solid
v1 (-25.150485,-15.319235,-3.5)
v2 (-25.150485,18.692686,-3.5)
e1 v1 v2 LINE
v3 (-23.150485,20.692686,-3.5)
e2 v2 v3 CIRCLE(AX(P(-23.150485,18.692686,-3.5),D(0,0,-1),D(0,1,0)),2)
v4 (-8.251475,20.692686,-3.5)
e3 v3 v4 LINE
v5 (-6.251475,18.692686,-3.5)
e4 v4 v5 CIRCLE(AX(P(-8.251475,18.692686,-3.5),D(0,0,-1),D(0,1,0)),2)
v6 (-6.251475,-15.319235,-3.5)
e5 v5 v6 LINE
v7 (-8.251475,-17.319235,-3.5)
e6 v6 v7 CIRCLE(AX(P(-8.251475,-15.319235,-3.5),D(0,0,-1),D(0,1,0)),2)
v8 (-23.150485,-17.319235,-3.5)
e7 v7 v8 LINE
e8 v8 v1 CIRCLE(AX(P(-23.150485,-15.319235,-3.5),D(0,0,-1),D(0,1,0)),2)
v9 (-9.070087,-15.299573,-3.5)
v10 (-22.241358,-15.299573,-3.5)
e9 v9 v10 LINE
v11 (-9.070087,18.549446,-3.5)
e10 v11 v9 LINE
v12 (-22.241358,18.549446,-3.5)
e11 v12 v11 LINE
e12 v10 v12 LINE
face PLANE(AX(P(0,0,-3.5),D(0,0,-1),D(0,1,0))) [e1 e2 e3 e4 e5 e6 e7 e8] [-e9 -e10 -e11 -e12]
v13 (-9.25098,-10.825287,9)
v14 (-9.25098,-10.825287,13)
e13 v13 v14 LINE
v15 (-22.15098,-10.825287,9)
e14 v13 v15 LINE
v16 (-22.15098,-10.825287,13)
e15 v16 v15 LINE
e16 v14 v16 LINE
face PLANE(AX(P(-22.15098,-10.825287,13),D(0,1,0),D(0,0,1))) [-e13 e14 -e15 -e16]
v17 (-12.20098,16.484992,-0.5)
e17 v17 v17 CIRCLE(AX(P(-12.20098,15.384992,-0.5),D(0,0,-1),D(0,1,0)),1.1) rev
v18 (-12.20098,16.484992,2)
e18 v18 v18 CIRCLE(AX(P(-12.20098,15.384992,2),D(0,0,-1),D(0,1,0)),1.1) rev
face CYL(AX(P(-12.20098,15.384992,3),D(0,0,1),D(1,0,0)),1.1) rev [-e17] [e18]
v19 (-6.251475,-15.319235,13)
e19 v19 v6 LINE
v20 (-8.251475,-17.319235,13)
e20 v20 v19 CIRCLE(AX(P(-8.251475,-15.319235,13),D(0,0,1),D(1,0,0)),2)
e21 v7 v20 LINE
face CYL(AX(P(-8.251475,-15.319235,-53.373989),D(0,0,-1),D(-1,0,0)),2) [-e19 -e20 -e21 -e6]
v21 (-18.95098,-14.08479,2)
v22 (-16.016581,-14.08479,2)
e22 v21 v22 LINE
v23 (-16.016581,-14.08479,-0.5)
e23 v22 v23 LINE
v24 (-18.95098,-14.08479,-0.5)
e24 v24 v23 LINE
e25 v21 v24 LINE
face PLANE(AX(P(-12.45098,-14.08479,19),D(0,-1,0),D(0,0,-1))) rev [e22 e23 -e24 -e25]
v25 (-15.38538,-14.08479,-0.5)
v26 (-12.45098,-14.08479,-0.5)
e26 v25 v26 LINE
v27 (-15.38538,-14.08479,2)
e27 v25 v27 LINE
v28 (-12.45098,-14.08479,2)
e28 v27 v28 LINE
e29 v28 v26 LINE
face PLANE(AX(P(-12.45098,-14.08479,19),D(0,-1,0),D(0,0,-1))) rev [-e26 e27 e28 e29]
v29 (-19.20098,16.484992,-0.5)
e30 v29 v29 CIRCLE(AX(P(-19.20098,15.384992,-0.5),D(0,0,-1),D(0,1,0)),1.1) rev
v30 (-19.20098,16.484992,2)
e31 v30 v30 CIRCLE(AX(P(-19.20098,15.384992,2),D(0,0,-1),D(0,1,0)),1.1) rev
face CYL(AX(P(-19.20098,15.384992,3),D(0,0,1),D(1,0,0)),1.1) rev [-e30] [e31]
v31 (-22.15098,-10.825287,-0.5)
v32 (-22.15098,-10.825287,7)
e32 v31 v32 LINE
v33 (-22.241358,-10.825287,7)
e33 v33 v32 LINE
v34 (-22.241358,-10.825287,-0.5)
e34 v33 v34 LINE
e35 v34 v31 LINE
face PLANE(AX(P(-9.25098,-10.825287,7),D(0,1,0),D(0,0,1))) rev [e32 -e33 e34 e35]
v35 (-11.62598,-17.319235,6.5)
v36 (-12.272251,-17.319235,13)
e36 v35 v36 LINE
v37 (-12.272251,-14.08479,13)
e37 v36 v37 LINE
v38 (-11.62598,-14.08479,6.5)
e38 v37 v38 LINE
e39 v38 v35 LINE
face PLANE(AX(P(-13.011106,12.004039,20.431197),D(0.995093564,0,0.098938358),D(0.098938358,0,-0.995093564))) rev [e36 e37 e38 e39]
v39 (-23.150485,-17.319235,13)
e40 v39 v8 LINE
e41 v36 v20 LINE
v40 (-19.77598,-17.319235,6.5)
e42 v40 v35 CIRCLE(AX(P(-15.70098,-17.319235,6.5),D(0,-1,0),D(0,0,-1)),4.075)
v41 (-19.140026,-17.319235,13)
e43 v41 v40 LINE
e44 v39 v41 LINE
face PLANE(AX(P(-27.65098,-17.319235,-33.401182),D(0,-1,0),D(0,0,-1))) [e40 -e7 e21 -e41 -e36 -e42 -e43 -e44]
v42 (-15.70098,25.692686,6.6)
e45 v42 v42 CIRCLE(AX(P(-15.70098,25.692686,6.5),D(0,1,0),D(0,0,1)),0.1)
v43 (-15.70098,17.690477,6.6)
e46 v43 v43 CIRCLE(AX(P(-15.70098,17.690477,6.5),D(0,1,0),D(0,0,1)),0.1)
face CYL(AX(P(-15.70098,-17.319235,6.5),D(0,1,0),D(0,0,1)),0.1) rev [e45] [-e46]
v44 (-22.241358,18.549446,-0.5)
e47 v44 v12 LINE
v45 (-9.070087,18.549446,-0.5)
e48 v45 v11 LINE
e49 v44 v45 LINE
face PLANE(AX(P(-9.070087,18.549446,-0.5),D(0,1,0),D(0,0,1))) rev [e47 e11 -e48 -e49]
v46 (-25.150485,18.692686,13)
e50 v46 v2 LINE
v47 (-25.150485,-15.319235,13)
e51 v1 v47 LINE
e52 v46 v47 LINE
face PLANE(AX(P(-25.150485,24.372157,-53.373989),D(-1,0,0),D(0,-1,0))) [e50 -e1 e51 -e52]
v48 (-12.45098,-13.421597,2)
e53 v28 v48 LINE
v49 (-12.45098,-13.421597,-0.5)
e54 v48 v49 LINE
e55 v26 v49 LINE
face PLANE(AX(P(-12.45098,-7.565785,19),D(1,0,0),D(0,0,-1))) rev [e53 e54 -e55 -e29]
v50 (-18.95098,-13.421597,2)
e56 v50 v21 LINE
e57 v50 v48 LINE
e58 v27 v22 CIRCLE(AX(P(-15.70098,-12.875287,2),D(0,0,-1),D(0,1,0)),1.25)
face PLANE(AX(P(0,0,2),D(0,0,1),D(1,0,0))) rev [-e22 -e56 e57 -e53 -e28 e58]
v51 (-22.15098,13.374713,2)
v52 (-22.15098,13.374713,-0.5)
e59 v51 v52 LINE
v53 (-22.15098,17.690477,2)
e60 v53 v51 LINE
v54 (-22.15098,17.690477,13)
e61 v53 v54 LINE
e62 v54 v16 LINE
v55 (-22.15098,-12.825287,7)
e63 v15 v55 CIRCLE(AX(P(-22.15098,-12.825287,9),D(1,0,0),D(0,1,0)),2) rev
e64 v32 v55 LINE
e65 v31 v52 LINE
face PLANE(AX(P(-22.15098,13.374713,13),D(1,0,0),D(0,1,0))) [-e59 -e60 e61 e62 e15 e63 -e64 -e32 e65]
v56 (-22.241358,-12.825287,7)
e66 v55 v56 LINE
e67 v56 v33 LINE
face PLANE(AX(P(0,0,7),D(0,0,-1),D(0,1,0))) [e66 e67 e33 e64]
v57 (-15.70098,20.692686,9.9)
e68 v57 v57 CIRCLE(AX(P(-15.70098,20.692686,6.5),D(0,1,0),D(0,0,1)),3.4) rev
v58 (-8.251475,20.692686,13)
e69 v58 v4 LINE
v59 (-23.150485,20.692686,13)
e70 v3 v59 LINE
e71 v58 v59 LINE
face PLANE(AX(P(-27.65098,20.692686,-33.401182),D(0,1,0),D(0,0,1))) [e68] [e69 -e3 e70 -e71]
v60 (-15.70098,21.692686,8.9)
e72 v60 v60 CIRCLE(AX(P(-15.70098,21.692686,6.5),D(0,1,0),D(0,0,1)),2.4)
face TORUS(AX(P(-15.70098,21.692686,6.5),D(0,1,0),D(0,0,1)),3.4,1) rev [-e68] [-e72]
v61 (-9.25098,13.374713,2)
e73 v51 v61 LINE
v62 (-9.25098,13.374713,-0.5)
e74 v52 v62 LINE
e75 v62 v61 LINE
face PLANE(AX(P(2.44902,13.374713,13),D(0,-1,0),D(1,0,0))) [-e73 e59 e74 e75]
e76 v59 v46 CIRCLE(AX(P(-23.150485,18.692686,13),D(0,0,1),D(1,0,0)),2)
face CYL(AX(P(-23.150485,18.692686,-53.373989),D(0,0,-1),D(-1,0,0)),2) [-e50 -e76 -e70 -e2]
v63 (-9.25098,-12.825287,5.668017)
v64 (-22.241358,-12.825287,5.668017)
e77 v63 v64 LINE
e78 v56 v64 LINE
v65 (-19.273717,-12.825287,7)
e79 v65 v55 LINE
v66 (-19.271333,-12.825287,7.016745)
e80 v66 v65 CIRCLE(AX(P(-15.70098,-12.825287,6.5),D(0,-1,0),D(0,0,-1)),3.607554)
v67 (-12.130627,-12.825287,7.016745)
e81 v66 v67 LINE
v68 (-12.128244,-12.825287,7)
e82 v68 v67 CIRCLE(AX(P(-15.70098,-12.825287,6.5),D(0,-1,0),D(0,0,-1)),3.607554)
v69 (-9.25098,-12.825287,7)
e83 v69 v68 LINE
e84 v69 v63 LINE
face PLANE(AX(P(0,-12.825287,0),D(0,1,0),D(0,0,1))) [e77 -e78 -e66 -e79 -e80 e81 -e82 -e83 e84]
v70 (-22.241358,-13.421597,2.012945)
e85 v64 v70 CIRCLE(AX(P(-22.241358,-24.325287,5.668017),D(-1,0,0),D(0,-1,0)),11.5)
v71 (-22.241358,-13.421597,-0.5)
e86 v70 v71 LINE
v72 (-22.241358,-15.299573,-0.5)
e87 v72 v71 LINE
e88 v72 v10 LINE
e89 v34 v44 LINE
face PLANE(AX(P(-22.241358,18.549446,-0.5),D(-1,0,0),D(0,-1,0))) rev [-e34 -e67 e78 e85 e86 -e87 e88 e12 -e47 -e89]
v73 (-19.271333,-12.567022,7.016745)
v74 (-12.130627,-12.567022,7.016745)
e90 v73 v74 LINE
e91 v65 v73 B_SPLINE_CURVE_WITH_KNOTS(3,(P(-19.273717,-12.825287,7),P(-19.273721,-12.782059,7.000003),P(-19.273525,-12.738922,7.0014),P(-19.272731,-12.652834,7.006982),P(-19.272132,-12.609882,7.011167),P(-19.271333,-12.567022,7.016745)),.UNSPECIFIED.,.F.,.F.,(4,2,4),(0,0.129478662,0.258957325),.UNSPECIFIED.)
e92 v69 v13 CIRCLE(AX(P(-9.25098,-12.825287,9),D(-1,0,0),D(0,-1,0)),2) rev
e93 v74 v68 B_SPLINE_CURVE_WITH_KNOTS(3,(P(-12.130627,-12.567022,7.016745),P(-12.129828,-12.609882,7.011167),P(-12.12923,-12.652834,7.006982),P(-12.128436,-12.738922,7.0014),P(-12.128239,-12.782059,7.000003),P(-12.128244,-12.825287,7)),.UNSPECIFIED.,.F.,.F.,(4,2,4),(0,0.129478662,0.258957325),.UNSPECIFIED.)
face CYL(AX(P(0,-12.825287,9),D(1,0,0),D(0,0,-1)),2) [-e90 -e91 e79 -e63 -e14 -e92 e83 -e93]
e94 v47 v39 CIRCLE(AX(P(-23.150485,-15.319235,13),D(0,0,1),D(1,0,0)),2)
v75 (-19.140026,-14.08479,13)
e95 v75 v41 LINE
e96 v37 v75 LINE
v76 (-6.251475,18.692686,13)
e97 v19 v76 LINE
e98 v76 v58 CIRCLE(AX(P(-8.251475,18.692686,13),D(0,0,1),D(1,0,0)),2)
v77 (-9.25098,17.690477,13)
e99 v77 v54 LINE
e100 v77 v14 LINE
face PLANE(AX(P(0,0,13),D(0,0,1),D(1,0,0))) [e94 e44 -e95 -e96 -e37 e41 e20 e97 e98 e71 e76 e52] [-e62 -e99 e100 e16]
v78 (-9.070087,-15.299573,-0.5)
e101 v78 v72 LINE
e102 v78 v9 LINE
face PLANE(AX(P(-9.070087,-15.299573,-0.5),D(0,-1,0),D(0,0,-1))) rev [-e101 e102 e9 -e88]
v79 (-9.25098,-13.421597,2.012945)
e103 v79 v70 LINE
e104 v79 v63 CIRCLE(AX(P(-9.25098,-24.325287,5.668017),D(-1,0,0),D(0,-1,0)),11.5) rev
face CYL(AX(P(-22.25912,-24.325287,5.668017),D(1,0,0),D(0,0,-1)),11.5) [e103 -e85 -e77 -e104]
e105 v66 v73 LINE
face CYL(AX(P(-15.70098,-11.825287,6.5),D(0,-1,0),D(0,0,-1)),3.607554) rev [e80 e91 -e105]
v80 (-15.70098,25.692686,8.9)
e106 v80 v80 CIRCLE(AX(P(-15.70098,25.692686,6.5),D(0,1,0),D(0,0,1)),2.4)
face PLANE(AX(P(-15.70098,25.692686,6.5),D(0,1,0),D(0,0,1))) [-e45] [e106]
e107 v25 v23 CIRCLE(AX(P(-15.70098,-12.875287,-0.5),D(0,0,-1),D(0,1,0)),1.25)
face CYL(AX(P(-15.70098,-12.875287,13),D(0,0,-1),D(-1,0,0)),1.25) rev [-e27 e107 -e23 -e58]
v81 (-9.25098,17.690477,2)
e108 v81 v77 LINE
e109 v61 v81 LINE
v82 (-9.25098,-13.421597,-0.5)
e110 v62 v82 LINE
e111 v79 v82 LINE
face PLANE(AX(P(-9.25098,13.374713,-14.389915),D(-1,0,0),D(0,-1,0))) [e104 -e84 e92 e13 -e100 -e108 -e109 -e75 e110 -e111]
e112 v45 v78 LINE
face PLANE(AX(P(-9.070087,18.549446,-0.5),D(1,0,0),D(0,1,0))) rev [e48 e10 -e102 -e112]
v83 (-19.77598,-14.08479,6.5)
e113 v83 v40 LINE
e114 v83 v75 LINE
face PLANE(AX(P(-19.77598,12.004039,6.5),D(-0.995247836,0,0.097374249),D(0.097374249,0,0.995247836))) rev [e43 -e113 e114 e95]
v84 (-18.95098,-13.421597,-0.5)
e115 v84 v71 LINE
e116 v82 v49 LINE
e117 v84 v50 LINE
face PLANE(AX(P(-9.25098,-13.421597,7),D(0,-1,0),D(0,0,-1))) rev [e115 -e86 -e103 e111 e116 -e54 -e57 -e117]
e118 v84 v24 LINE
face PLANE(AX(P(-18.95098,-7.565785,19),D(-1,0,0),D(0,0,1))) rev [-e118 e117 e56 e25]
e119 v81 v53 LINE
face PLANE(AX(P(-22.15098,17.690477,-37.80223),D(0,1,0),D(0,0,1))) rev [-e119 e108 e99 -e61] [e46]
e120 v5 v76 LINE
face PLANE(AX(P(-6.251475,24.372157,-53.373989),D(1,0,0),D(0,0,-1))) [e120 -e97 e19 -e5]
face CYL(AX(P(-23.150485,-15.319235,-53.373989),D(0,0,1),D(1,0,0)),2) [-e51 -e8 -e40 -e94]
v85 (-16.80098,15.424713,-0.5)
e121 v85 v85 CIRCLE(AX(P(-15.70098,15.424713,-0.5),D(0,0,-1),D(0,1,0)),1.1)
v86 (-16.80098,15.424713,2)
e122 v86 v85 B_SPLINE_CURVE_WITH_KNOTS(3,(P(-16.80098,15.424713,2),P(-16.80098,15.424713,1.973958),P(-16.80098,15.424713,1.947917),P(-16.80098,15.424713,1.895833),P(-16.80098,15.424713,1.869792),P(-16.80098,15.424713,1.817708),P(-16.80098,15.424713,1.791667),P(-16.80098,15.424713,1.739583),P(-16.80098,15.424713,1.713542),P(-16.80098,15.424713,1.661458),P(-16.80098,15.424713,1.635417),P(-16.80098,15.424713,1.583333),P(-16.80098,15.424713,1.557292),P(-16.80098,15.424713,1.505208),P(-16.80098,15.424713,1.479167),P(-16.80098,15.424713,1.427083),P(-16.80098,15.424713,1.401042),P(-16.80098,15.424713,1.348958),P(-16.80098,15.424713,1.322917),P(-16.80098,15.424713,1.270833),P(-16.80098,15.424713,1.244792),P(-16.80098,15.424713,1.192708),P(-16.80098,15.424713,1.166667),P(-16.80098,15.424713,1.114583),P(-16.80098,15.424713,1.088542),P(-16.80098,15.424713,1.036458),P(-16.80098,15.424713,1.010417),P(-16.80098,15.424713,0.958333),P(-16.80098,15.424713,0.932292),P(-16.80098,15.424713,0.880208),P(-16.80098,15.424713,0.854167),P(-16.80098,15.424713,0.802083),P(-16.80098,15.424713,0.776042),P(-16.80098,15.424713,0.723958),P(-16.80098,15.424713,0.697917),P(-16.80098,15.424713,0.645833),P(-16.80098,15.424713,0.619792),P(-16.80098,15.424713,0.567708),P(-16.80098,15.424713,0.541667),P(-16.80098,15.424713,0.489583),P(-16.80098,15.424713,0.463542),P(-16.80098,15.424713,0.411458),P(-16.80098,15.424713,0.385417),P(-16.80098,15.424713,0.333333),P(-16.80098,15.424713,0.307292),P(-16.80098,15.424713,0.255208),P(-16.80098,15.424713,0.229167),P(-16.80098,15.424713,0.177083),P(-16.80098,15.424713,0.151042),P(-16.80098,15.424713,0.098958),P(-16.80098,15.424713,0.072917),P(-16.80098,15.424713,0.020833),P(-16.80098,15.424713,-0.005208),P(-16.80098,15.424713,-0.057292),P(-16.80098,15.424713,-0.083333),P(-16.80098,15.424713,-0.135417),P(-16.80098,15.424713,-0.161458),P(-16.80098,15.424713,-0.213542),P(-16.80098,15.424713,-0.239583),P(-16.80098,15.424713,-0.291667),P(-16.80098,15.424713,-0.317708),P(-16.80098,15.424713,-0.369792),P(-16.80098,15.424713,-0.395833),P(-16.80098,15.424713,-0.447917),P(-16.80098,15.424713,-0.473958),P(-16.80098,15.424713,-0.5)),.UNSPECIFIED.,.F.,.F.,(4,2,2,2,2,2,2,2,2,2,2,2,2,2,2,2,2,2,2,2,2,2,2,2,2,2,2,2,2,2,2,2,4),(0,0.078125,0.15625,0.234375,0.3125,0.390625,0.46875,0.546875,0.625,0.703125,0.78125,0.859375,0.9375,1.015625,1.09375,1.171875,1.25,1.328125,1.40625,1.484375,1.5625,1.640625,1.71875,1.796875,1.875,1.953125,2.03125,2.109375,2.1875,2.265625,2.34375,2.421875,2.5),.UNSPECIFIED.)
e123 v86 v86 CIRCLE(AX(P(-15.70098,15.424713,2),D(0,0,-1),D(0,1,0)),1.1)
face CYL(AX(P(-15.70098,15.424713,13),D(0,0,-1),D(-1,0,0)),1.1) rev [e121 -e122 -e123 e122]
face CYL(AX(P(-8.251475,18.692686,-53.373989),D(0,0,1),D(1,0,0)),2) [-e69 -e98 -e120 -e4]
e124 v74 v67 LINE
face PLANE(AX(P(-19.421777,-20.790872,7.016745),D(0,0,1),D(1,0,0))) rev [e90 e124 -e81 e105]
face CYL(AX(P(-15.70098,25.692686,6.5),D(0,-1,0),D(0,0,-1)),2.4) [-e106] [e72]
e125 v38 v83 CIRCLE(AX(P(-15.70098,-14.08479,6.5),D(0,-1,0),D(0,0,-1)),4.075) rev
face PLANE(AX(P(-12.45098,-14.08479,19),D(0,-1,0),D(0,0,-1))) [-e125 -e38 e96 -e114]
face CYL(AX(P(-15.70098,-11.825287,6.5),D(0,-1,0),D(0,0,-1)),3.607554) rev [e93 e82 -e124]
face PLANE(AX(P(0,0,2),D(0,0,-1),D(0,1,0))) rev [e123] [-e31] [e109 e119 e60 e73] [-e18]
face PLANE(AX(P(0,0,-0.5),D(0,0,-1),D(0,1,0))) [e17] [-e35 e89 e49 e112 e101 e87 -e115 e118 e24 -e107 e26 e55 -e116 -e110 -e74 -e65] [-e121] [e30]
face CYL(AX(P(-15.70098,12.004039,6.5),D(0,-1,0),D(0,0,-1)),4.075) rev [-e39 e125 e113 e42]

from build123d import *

# Parameters (mm, degrees)
SKETCH_1_W                = 32.6
SKETCH_1_H                = 34.6
SKETCH_1_R                = 1.1
SKETCH_1_R_2              = 1.25
SKETCH_1_W_2              = 24.6
SKETCH_1_H_2              = 24.2
EXTRUDE_1_DEPTH           = 13
SKETCH_3_W                = 6.5
SKETCH_3_H                = 6.519005167
CUT_EXTRUDE_1_DEPTH       = 19
SKETCH_4_W                = 6.5
SKETCH_4_H                = 6.467668889
CUT_EXTRUDE_2_DEPTH       = 23
EXTRUDE_2_DEPTH           = 50
SKETCH_1_2_W              = 22.27659965
SKETCH_1_2_H              = 4.598586669
SKETCH_1_2_W_2            = 22.283050596
SKETCH_1_2_H_2            = 4.977540741
CUT_EXTRUDE_5_DEPTH       = 34
FILLET_1_R                = 2
FILLET_2_R                = 2
SKETCH_9_W                = 54.594998093
SKETCH_9_H                = 18.111982385
SKETCH_9_W_2              = 52.534809486
SKETCH_9_H_2              = 12.989301534
CUT_EXTRUDE_6_DEPTH       = 41
FILLET_6_R                = 22
EXTRUDE_4_DEPTH           = 13
SKETCH_13_W               = 5.518907879
SKETCH_13_H               = 8.361822047
CUT_EXTRUDE_8_DEPTH       = 8.5
SKETCH_14_W               = 6.038657432
SKETCH_14_H               = 7.741248121
CUT_EXTRUDE_9_DEPTH       = 8.5
SKETCH_23_OUTSIDE_W       = 35.102
SKETCH_23_OUTSIDE_H       = 56.702
SKETCH_23_OUTSIDE_W_2     = 1.5
SKETCH_23_OUTSIDE_H_2     = 34.6
CUT_EXTRUDE_10_DEPTH      = 104
SKETCH_24_W               = 10.341780897
SKETCH_24_H               = 5.2
SKETCH_24_R               = 1.25
EXTRUDE_5_DEPTH           = 1.5
SKETCH_25_R               = 1.25
CUT_EXTRUDE_11_DEPTH      = 104
SKETCH_26_OUTSIDE_W       = 115.402
SKETCH_26_OUTSIDE_H       = 56.536
SKETCH_26_OUTSIDE_W_2     = 17.268409177
SKETCH_26_OUTSIDE_H_2     = 34.6
CUT_EXTRUDE_12_DEPTH      = 10
SKETCH_27_W               = 2.368409177
SKETCH_27_H               = 25.781356428
EXTRUDE_6_DEPTH           = 1.5
SKETCH_28_R               = 1.1
CUT_EXTRUDE_13_DEPTH      = 10
CUT_EXTRUDE_START         = -2
CUT_EXTRUDE_14_OUTLINE_W  = 0.368409177
CUT_EXTRUDE_14_OUTLINE_H  = 34.6
CUT_EXTRUDE_14_DEPTH      = 3
SKETCH_30_W               = 15.411127821
SKETCH_30_H               = 34.6
EXTRUDE_7_DEPTH           = 1.5
SKETCH_33_W               = 23.9
SKETCH_33_H               = 38.011921137
SKETCH_33_R               = 1.1
EXTRUDE_8_DEPTH           = 15
SKETCH_34_OUTSIDE_W       = 35.468
SKETCH_34_OUTSIDE_H       = 49.58
SKETCH_34_OUTSIDE_W_2     = 18.899009792
SKETCH_34_OUTSIDE_H_2     = 43.211027868
CUT_EXTRUDE_15_DEPTH      = 13.5
SKETCH_35_W               = 12.9
SKETCH_35_H               = 31.784162084
CUT_EXTRUDE_16_DEPTH      = 11
SKETCH_37_R               = 2.4
EXTRUDE_9_DEPTH           = 5
SKETCH_39_W               = 13.171271292
SKETCH_39_H               = 33.849019387
CUT_EXTRUDE_17_DEPTH      = 3
FILLET_7_R                = 3
CUT_EXTRUDE_18_DEPTH      = 53.759852886
CUT_EXTRUDE_18_DEPTH_BACK = 53.759852886
SKETCH_40_R               = 0.1
SKETCH_42_W               = 13.648654979
SKETCH_42_H               = 4.665334349
EXTRUDE_10_DEPTH          = 11
CUT_EXTRUDE_19_DEPTH      = 4.493948053
SKETCH_43_R               = 3.607554058
CUT_EXTRUDE_20_DEPTH      = 1
SKETCH_44_W               = 12.990377478
SKETCH_44_H               = 2.596310078
CUT_EXTRUDE_21_DEPTH      = 7.5
SKETCH_46_W               = 13.018615597
SKETCH_46_H               = 10.987054625
EXTRUDE_11_DEPTH          = 1.259502583
SKETCH_48_W               = 7.320827495
SKETCH_48_H               = 3.139430645
EXTRUDE_12_DEPTH          = 1
FILLET_9_R                = 11.5
FILLET_11_R               = 2
CUT_EXTRUDE_23_DEPTH      = 41.086666278
CUT_EXTRUDE_23_DEPTH_BACK = 41.086666278
SKETCH_50_W               = 13.704348931
SKETCH_50_H               = 44.342522193
SKETCH_50_W_2             = 6.251475496
FILLET_12_R               = 2
FILLET_13_R               = 1


with BuildPart() as part:
    # Sketch 1 → 凸台-拉伸1 (new body)
    with BuildSketch(Plane.XY):
        with Locations((-9.850980392, 1.274712581)):
            Rectangle(SKETCH_1_W, SKETCH_1_H)
        with Locations(Location((-15.700980392, 15.424712581, 0), (0, 0, 180))):
            Circle(SKETCH_1_R, mode=Mode.SUBTRACT)
        with Locations(Location((-3.600980392, 15.424712581, 0), (0, 0, 180))):
            Circle(SKETCH_1_R_2, mode=Mode.SUBTRACT)
        with Locations(Location((-15.700980392, -12.875287419, 0), (0, 0, 180))):
            Circle(SKETCH_1_R_2, mode=Mode.SUBTRACT)
        with Locations(Location((-3.600980392, -12.875287419, 0), (0, 0, 180))):
            Circle(SKETCH_1_R_2, mode=Mode.SUBTRACT)
        with Locations((-9.850980392, 1.274712581)):
            Rectangle(SKETCH_1_W_2, SKETCH_1_H_2, mode=Mode.SUBTRACT)
    extrude(amount=EXTRUDE_1_DEPTH)

    # 草图3 → 切除-拉伸1 (cut)
    with BuildSketch(Plane(origin=(0, 0, 0), x_dir=(-1, 0, 0), z_dir=(0, 0, -1))):
        with Locations((15.700980392, -10.82528742)):
            Rectangle(SKETCH_3_W, SKETCH_3_H)
    extrude(amount=-CUT_EXTRUDE_1_DEPTH, mode=Mode.SUBTRACT)

    # 草图4 → 切除-拉伸2 (cut)
    with BuildSketch(Plane.XY.offset(13)):
        with Locations((-3.600980392, -10.82528742)):
            Rectangle(SKETCH_4_W, SKETCH_4_H)
    extrude(amount=-CUT_EXTRUDE_2_DEPTH, mode=Mode.SUBTRACT)

    # 草图5 → 凸台-拉伸2 (add)
    with BuildSketch(Plane(origin=(6.449019608, 0, 0), x_dir=(0, 0, -1), z_dir=(1, 0, 0))):
        Polygon((-13, 18.574712581), (-13, 10.055461473), (-13, -16.025287419), (0, -16.025287419), (0, -15.027567927), (0, 16.282461831), (0, 18.574712581), align=None)
    extrude(amount=EXTRUDE_2_DEPTH)

    # Sketch 1 2 → 切除-拉伸5 (cut)
    with BuildSketch(Plane.XY.offset(13)):
        with Locations((24.037173058, -7.263594431)):
            Rectangle(SKETCH_1_2_W, SKETCH_1_2_H)
        with Locations((24.078382453, 0.81654228)):
            Rectangle(SKETCH_1_2_W_2, SKETCH_1_2_H_2)
    extrude(amount=-CUT_EXTRUDE_5_DEPTH, mode=Mode.SUBTRACT)

    # 圆角1
    fillet_1_edges = [part.edges().sort_by_distance(p)[0] for p in [
        (12.936857155, -1.672228091, 6.5),
        (12.936857155, 3.30531265, 6.5),
        (35.219907751, 3.30531265, 6.5),
        (35.219907751, -1.672228091, 6.5),
        (12.898873233, -9.562887765, 6.5),
        (12.898873233, -4.964301096, 6.5),
        (35.175472883, -4.964301096, 6.5),
        (35.175472883, -9.562887765, 6.5),
    ]]
    fillet(fillet_1_edges, radius=FILLET_1_R)

    # 圆角2
    fillet_2_edges = [part.edges().sort_by_distance(p)[0] for p in [
        (-26.150980392, -16.025287419, 6.5),
        (-26.150980392, 18.574712581, 6.5),
    ]]
    fillet(fillet_2_edges, radius=FILLET_2_R)

    # 草图9 → 切除-拉伸6 (cut)
    with BuildSketch(Plane(origin=(0, 0, 0), x_dir=(-1, 0, 0), z_dir=(0, 0, -1))):
        with Locations((-36.934177516, 16.051357777)):
            Rectangle(SKETCH_9_W, SKETCH_9_H)
        with Locations((-36.653242706, -19.247200889)):
            Rectangle(SKETCH_9_W_2, SKETCH_9_H_2)
    extrude(amount=-CUT_EXTRUDE_6_DEPTH, mode=Mode.SUBTRACT)

    # 圆角6
    # the kernel refuses this fillet: 22 mm, written as the material it adds along each edge
    with BuildSketch(Plane(origin=(9.636678469, 6.995366584, 0), x_dir=(0, 1, 0), z_dir=(0, 0, 1))) as fillet_6_piece_1:
        with BuildLine():
            CenterArc((22, -19.375499223), FILLET_6_R, 118.272534833, 61.727465167)
            Line((0, -19.375499223), (-0.44, -19.375499223))
            Line((-0.44, -19.375499223), (-0.44, 0))
            Line((-0.44, 0), (0, 0.44))
            ThreePointArc((0, 0.44), (5.789672998, 0.44), (11.370932916, 0.387509984))
            Line((11.370932916, 0.387509984), (11.579345996, 0))
        make_face()
    extrude(amount=13)
    with BuildSketch(Plane(origin=(10.385837963, -12.752550122, 0), x_dir=(1, 0, 0), z_dir=(0, 0, 1))) as fillet_6_piece_2:
        with BuildLine():
            CenterArc((11.54511289, -22), FILLET_6_R, 90, 31.653290012)
            Line((0, -3.272737297), (-0.230902258, -2.898192043))
            ThreePointArc((-0.230902258, -2.898192043), (-0.44, -1.636368649), (-0.44, 0))
            Line((-0.44, 0), (0, 0.44))
            Line((0, 0.44), (11.54511289, 0.44))
            Line((11.54511289, 0.44), (11.54511289, 0))
        make_face()
    extrude(amount=13)

    # 草图12 → 凸台-拉伸4 (add)
    with BuildSketch(Plane(origin=(0, 0, 0), x_dir=(-1, 0, 0), z_dir=(0, 0, -1))):
        with BuildLine():
            Line((24.150980392, 18.574712581), (24.496655084, -15.99518818))
            ThreePointArc((24.496655084, -15.99518818), (37.015647173, 1.416671567), (24.150980392, 18.574712581))
        make_face()
        with BuildLine():
            Line((26.822698684, 1.289948959), (26.822698684, -8.431688638))
            ThreePointArc((26.822698684, -8.431688638), (32.027920461, 1.289948959), (26.822698684, 11.011586556))
            Line((26.822698684, 11.011586556), (26.822698684, 1.289948959))
        make_face(mode=Mode.SUBTRACT)
    extrude(amount=-EXTRUDE_4_DEPTH)

    # 草图13 → 切除-拉伸8 (cut)
    with BuildSketch(Plane.XY.offset(13)):
        with Locations((-3.600980393, 15.424712581)):
            Rectangle(SKETCH_13_W, SKETCH_13_H)
    extrude(amount=-CUT_EXTRUDE_8_DEPTH, mode=Mode.SUBTRACT)

    # 草图14 → 切除-拉伸9 (cut)
    with BuildSketch(Plane(origin=(0, 0, 0), x_dir=(-1, 0, 0), z_dir=(0, 0, -1))):
        with Locations((15.700980392, 15.424712581)):
            Rectangle(SKETCH_14_W, SKETCH_14_H)
    extrude(amount=-CUT_EXTRUDE_9_DEPTH, mode=Mode.SUBTRACT)

    # 草图23 outside → 切除-拉伸10 (cut)
    with BuildSketch(Plane(origin=(56.449019608, 0, 0), x_dir=(0, 0, -1), z_dir=(1, 0, 0))):
        with Locations((-6.5, 1.275)):
            Rectangle(SKETCH_23_OUTSIDE_W, SKETCH_23_OUTSIDE_H)
        with Locations((-12.25, 1.274712581)):
            Rectangle(SKETCH_23_OUTSIDE_W_2, SKETCH_23_OUTSIDE_H_2, mode=Mode.SUBTRACT)
    extrude(amount=-CUT_EXTRUDE_10_DEPTH, mode=Mode.SUBTRACT)

    # 草图24 → 凸台-拉伸5 (add)
    with BuildSketch(Plane.XY.offset(13)):
        with Locations((-4.17557206, 15.974712581)):
            Rectangle(SKETCH_24_W, SKETCH_24_H)
        with Locations((-3.600980392, 15.429779286)):
            Circle(SKETCH_24_R, mode=Mode.SUBTRACT)
    extrude(amount=-EXTRUDE_5_DEPTH)

    # 草图25 → 切除-拉伸11 (cut)
    with BuildSketch(Plane.XY.offset(13)):
        with Locations((42.624971711, -3.793205976)):
            Circle(SKETCH_25_R)
        with Locations((-34.434765713, 1.289948959)):
            Circle(SKETCH_25_R)
        with Locations((-25.484048207, 14.316394652)):
            Circle(SKETCH_25_R)
        with Locations((-25.484048207, -12.050711449)):
            Circle(SKETCH_25_R)
    extrude(amount=-CUT_EXTRUDE_11_DEPTH, mode=Mode.SUBTRACT)

    # 草图26 outside → 切除-拉伸12 (cut)
    with BuildSketch(Plane.XY.offset(13)):
        with Locations((9.716, 1.275)):
            Rectangle(SKETCH_26_OUTSIDE_W, SKETCH_26_OUTSIDE_H)
        with Locations((-15.516775803, 1.274712581)):
            Rectangle(SKETCH_26_OUTSIDE_W_2, SKETCH_26_OUTSIDE_H_2, mode=Mode.SUBTRACT)
    extrude(amount=-CUT_EXTRUDE_12_DEPTH, mode=Mode.SUBTRACT)

    # 草图27 → 凸台-拉伸6 (add)
    with BuildSketch(Plane.XY.offset(13)):
        with Locations((-8.066775804, 0.484034367)):
            Rectangle(SKETCH_27_W, SKETCH_27_H)
    extrude(amount=-EXTRUDE_6_DEPTH)

    # 草图28 → 切除-拉伸13 (cut)
    with BuildSketch(Plane.XY.offset(13)):
        with Locations((-19.200980392, 15.384992379)):
            Circle(SKETCH_28_R)
        with Locations((-12.200980392, 15.384992379)):
            Circle(SKETCH_28_R)
    extrude(amount=-CUT_EXTRUDE_13_DEPTH, mode=Mode.SUBTRACT)

    # 切除-拉伸14: read off the stored shape, not the designer's step
    # 切除-拉伸14 outline → 切除-拉伸14 (cut)
    with BuildSketch(Plane.XY.offset(13).offset(CUT_EXTRUDE_START)):
        with Locations((-7.066775804, 1.274712581)):
            Rectangle(CUT_EXTRUDE_14_OUTLINE_W, CUT_EXTRUDE_14_OUTLINE_H)
    extrude(amount=CUT_EXTRUDE_14_DEPTH, mode=Mode.SUBTRACT)

    # 草图30 → 凸台-拉伸7 (add)
    with BuildSketch(Plane.XY.offset(13)):
        Polygon((-27.650980392, 18.574712581), (-27.650980392, -16.025287419), (-27.650980392, -17.319235473), (-3.750980392, -17.319235473), (-3.750980392, -16.025287419), (-3.750980392, 18.574712581), (-3.750980392, 20.692685664), (-27.650980392, 20.692685664), align=None)
        with Locations((-15.213421192, 1.274712581)):
            Rectangle(SKETCH_30_W, SKETCH_30_H, mode=Mode.SUBTRACT)
    extrude(amount=-EXTRUDE_7_DEPTH)

    # 草图33 → 凸台-拉伸8 (add)
    with BuildSketch(Plane(origin=(0, 0, 11.5), x_dir=(-1, 0, 0), z_dir=(0, 0, -1))):
        with Locations((15.700980392, 1.686725095)):
            Rectangle(SKETCH_33_W, SKETCH_33_H)
        with Locations((15.700980392, 15.424712581)):
            Circle(SKETCH_33_R, mode=Mode.SUBTRACT)
        with Locations(Location((12.200980392, 15.384992379, 0), (0, 0, 180))):
            Circle(SKETCH_33_R, mode=Mode.SUBTRACT)
        with Locations(Location((19.200980392, 15.384992379, 0), (0, 0, 180))):
            Circle(SKETCH_33_R, mode=Mode.SUBTRACT)
        with BuildLine():
            Line((9.250980392, -10.825287419), (12.450980392, -10.825287419))
            Line((12.450980392, -10.825287419), (12.450980392, -14.084790003))
            Line((12.450980392, -14.084790003), (15.385380168, -14.084790003))
            ThreePointArc((15.385380168, -14.084790003), (15.700980392, -14.125287419), (16.016580616, -14.084790003))
            Line((16.016580616, -14.084790003), (18.950980392, -14.084790003))
            Line((18.950980392, -14.084790003), (18.950980392, -10.825287419))
            Line((18.950980392, -10.825287419), (22.150980392, -10.825287419))
            Line((22.150980392, -10.825287419), (22.150980392, 13.374712581))
            Line((22.150980392, 13.374712581), (9.250980392, 13.374712581))
            Line((9.250980392, 13.374712581), (9.250980392, -10.825287419))
        make_face(mode=Mode.SUBTRACT)
    extrude(amount=EXTRUDE_8_DEPTH)

    # 草图34 outside → 切除-拉伸15 (cut)
    with BuildSketch(Plane.XY.offset(13)):
        with Locations((-15.701, 1.687)):
            Rectangle(SKETCH_34_OUTSIDE_W, SKETCH_34_OUTSIDE_H)
        with Locations((-15.700980392, 2.766642636)):
            Rectangle(SKETCH_34_OUTSIDE_W_2, SKETCH_34_OUTSIDE_H_2, mode=Mode.SUBTRACT)
    extrude(amount=-CUT_EXTRUDE_15_DEPTH, mode=Mode.SUBTRACT)

    # 草图35 → 切除-拉伸16 (cut)
    with BuildSketch(Plane.XY.offset(13)):
        with Locations((-15.700980392, 1.798395824)):
            Rectangle(SKETCH_35_W, SKETCH_35_H)
    extrude(amount=-CUT_EXTRUDE_16_DEPTH, mode=Mode.SUBTRACT)

    # 草图37 → 凸台-拉伸9 (add)
    with BuildSketch(Plane(origin=(0, 20.692685664, 0), x_dir=(1, 0, 0), z_dir=(0, 1, 0))):
        with Locations(Location((-15.700980392, -6.5, 0), (0, 0, 270))):
            Circle(SKETCH_37_R)
    extrude(amount=EXTRUDE_9_DEPTH)

    # 草图39 → 切除-拉伸17 (cut)
    with BuildSketch(Plane(origin=(0, 0, -3.5), x_dir=(-1, 0, 0), z_dir=(0, 0, -1))):
        with Locations((15.655722224, 1.624936556)):
            Rectangle(SKETCH_39_W, SKETCH_39_H)
    extrude(amount=-CUT_EXTRUDE_17_DEPTH, mode=Mode.SUBTRACT)

    # 圆角7
    fillet_7_edges = [part.edges().sort_by_distance(p)[0] for p in [
        (-3.750980392, 20.692685664, -2),
        (-27.650980392, 20.692685664, -2),
        (-27.650980392, -17.319235473, -2),
        (-3.750980392, -17.319235473, -2),
    ]]
    fillet(fillet_7_edges, radius=FILLET_7_R)

    # 草图40 → 切除-拉伸18 (cut, two sides: drawn at the far end of the back side and taken through both)
    with BuildSketch(Plane(origin=(0, 25.692685664, 0), x_dir=(1, 0, 0), z_dir=(0, 1, 0)).offset(-CUT_EXTRUDE_18_DEPTH_BACK)):
        with Locations(Location((-15.700980392, -6.5, 0), (0, 0, 270))):
            Circle(SKETCH_40_R)
    extrude(amount=CUT_EXTRUDE_18_DEPTH + CUT_EXTRUDE_18_DEPTH_BACK, mode=Mode.SUBTRACT)

    # 草图42 → 凸台-拉伸10 (add)
    with BuildSketch(Plane.XY.offset(2)):
        with Locations((-15.66246504, -13.157954594)):
            Rectangle(SKETCH_42_W, SKETCH_42_H)
    extrude(amount=EXTRUDE_10_DEPTH)

    # 草图41 → 切除-拉伸19 (cut)
    with BuildSketch(Plane.XZ.offset(17.319235473)):
        with BuildLine():
            Line((-19.775980392, 6.5), (-18.406082759, 20.501521641))
            ThreePointArc((-18.406082759, 20.501521641), (-15.665794747, 23.749766381), (-13.011106202, 20.431197259))
            Line((-13.011106202, 20.431197259), (-11.625980392, 6.5))
            ThreePointArc((-11.625980392, 6.5), (-15.700980392, 2.425), (-19.775980392, 6.5))
        make_face()
    extrude(amount=-CUT_EXTRUDE_19_DEPTH, mode=Mode.SUBTRACT)

    # 草图43 → 切除-拉伸20 (cut)
    with BuildSketch(Plane.XZ.offset(12.825287419)):
        with Locations(Location((-15.700980392, 6.5, 0), (0, 0, 270))):
            Circle(SKETCH_43_R)
    extrude(amount=-CUT_EXTRUDE_20_DEPTH, mode=Mode.SUBTRACT)

    # 草图44 → 切除-拉伸21 (cut)
    with BuildSketch(Plane(origin=(0, 0, -0.5), x_dir=(-1, 0, 0), z_dir=(0, 0, -1))):
        with Locations((15.746169131, -12.123442458)):
            Rectangle(SKETCH_44_W, SKETCH_44_H)
    extrude(amount=-CUT_EXTRUDE_21_DEPTH, mode=Mode.SUBTRACT)

    # 草图46 → 凸台-拉伸11 (add)
    with BuildSketch(Plane.XZ.offset(12.825287419)):
        with Locations((-15.749811773, 7.506472688)):
            Rectangle(SKETCH_46_W, SKETCH_46_H)
    extrude(amount=EXTRUDE_11_DEPTH)

    # 草图48 → 凸台-拉伸12 (add)
    with BuildSketch(Plane.XZ.offset(11.825287419)):
        with Locations((-15.761363582, 8.5864607)):
            Rectangle(SKETCH_48_W, SKETCH_48_H)
    extrude(amount=EXTRUDE_12_DEPTH)

    # 圆角9
    # the kernel refuses this fillet: 11.5 mm, written as the material it takes off along each edge
    with BuildSketch(Plane(origin=(-22.24135787, -12.825287419, 2.012945375), x_dir=(0, -1.0, 1.3077435417698884e-12), z_dir=(1, 0, 0))) as fillet_9_piece_1:
        with BuildLine():
            CenterArc((11.5, -3.655071281), FILLET_9_R, 161.468118769, 18.531881231)
            Line((0, -3.655071281), (0, 0))
            Line((0, 0), (0.596310077, 0))
        make_face()
    extrude(amount=12.990377478, mode=Mode.SUBTRACT)

    # 圆角11
    # the kernel refuses this fillet: 2 mm, written as the material it takes off along each edge
    with BuildSketch(Plane(origin=(-9.250980392, -10.825287419, 7), x_dir=(0, 0, 1), z_dir=(-1, 0, 0))) as fillet_11_piece_1:
        with BuildLine():
            CenterArc((FILLET_11_R, -FILLET_11_R), FILLET_11_R, 90, 90)
            Line((0, -FILLET_11_R), (0, 0))
            Line((0, 0), (FILLET_11_R, 0))
        make_face()
    extrude(amount=12.9, mode=Mode.SUBTRACT)

    # 草图50 → 切除-拉伸23 (cut, two sides: drawn at the far end of the back side and taken through both)
    with BuildSketch(Plane.XY.offset(-0.5).offset(-CUT_EXTRUDE_23_DEPTH_BACK)):
        with Locations((-32.002659754, -1.520451896)):
            Rectangle(SKETCH_50_W, SKETCH_50_H)
        with Locations((-3.125737748, -1.520451896)):
            Rectangle(SKETCH_50_W_2, SKETCH_50_H)
    extrude(amount=CUT_EXTRUDE_23_DEPTH + CUT_EXTRUDE_23_DEPTH_BACK, mode=Mode.SUBTRACT)

    # 圆角12
    # the kernel refuses this fillet: 2 mm, written as the material it takes off along each edge
    with BuildSketch(Plane(origin=(-25.150485288, -17.27735901, 18.001095904), x_dir=(0.9997808672786077, -0.02093364334354982, 0), z_dir=(0, 0, -1))) as fillet_12_piece_1:
        with BuildLine():
            CenterArc((1.958571075, -1.999561735), FILLET_12_R, 88.800502969, 90)
            Line((-0.04099066, -1.957694448), (-0.240946833, -1.953507719))
            Line((-0.240946833, -1.953507719), (-0.199956173, 0.004186729))
            Line((-0.199956173, 0.004186729), (-0.029164742, 0.197862118))
            ThreePointArc((-0.029164742, 0.197862118), (0.504458794, 0.231367003), (2.00462509, 0.199956173))
            Line((2.00462509, 0.199956173), (2.000438362, 0))
        make_face()
    extrude(amount=26.502191808, mode=Mode.SUBTRACT)
    with BuildSketch(Plane(origin=(-6.251475496, -17.27735901, -8.501095904), x_dir=(0, 1, 0), z_dir=(0, 0, 1))) as fillet_12_piece_2:
        with BuildLine():
            CenterArc((1.958123537, 2), FILLET_12_R, 180, 90)
            Line((-0.041876463, 2), (-0.241876463, 2))
            ThreePointArc((-0.241876463, 2), (-0.241876463, 0.499504896), (-0.197208236, -0.033300326))
            Line((-0.197208236, -0.033300326), (0, -0.2))
            Line((0, -0.2), (1.958123537, -0.2))
            Line((1.958123537, -0.2), (1.958123537, 0))
        make_face()
    extrude(amount=26.502191808, mode=Mode.SUBTRACT)
    with BuildSketch(Plane(origin=(-6.251475496, 20.650809201, -8.501095904), x_dir=(-0.9997808672786077, 0.020933643343547987, -1.13466853616475e-15), z_dir=(0, 0, 1))) as fillet_12_piece_3:
        with BuildLine():
            CenterArc((1.958571075, 1.999561735), FILLET_12_R, 181.199497031, 90)
            Line((-0.04099066, 1.957694448), (-0.240946833, 1.953507719))
            Line((-0.240946833, 1.953507719), (-0.199956173, -0.004186729))
            Line((-0.199956173, -0.004186729), (-0.029164742, -0.197862118))
            ThreePointArc((-0.029164742, -0.197862118), (0.504458794, -0.231367003), (2.00462509, -0.199956173))
            Line((2.00462509, -0.199956173), (2.000438362, 0))
        make_face()
    extrude(amount=26.502191808, mode=Mode.SUBTRACT)
    with BuildSketch(Plane(origin=(-25.150485288, 20.650809201, 18.001095904), x_dir=(0, -1, 0), z_dir=(0, 0, -1))) as fillet_12_piece_4:
        with BuildLine():
            CenterArc((1.958123537, -2), FILLET_12_R, 90, 90)
            Line((-0.041876463, -2), (-0.241876463, -2))
            ThreePointArc((-0.241876463, -2), (-0.241876463, -0.499504896), (-0.197208236, 0.033300326))
            Line((-0.197208236, 0.033300326), (0, 0.2))
            Line((0, 0.2), (1.958123537, 0.2))
            Line((1.958123537, 0.2), (1.958123537, 0))
        make_face()
    extrude(amount=26.502191808, mode=Mode.SUBTRACT)

    # 圆角13
    fillet_13_edges = [part.edges().sort_by_distance(p)[0] for p in [
        (-15.700980392, 20.692685664, 4.1),
    ]]
    fillet(fillet_13_edges, radius=FILLET_13_R)


solid = part.part
